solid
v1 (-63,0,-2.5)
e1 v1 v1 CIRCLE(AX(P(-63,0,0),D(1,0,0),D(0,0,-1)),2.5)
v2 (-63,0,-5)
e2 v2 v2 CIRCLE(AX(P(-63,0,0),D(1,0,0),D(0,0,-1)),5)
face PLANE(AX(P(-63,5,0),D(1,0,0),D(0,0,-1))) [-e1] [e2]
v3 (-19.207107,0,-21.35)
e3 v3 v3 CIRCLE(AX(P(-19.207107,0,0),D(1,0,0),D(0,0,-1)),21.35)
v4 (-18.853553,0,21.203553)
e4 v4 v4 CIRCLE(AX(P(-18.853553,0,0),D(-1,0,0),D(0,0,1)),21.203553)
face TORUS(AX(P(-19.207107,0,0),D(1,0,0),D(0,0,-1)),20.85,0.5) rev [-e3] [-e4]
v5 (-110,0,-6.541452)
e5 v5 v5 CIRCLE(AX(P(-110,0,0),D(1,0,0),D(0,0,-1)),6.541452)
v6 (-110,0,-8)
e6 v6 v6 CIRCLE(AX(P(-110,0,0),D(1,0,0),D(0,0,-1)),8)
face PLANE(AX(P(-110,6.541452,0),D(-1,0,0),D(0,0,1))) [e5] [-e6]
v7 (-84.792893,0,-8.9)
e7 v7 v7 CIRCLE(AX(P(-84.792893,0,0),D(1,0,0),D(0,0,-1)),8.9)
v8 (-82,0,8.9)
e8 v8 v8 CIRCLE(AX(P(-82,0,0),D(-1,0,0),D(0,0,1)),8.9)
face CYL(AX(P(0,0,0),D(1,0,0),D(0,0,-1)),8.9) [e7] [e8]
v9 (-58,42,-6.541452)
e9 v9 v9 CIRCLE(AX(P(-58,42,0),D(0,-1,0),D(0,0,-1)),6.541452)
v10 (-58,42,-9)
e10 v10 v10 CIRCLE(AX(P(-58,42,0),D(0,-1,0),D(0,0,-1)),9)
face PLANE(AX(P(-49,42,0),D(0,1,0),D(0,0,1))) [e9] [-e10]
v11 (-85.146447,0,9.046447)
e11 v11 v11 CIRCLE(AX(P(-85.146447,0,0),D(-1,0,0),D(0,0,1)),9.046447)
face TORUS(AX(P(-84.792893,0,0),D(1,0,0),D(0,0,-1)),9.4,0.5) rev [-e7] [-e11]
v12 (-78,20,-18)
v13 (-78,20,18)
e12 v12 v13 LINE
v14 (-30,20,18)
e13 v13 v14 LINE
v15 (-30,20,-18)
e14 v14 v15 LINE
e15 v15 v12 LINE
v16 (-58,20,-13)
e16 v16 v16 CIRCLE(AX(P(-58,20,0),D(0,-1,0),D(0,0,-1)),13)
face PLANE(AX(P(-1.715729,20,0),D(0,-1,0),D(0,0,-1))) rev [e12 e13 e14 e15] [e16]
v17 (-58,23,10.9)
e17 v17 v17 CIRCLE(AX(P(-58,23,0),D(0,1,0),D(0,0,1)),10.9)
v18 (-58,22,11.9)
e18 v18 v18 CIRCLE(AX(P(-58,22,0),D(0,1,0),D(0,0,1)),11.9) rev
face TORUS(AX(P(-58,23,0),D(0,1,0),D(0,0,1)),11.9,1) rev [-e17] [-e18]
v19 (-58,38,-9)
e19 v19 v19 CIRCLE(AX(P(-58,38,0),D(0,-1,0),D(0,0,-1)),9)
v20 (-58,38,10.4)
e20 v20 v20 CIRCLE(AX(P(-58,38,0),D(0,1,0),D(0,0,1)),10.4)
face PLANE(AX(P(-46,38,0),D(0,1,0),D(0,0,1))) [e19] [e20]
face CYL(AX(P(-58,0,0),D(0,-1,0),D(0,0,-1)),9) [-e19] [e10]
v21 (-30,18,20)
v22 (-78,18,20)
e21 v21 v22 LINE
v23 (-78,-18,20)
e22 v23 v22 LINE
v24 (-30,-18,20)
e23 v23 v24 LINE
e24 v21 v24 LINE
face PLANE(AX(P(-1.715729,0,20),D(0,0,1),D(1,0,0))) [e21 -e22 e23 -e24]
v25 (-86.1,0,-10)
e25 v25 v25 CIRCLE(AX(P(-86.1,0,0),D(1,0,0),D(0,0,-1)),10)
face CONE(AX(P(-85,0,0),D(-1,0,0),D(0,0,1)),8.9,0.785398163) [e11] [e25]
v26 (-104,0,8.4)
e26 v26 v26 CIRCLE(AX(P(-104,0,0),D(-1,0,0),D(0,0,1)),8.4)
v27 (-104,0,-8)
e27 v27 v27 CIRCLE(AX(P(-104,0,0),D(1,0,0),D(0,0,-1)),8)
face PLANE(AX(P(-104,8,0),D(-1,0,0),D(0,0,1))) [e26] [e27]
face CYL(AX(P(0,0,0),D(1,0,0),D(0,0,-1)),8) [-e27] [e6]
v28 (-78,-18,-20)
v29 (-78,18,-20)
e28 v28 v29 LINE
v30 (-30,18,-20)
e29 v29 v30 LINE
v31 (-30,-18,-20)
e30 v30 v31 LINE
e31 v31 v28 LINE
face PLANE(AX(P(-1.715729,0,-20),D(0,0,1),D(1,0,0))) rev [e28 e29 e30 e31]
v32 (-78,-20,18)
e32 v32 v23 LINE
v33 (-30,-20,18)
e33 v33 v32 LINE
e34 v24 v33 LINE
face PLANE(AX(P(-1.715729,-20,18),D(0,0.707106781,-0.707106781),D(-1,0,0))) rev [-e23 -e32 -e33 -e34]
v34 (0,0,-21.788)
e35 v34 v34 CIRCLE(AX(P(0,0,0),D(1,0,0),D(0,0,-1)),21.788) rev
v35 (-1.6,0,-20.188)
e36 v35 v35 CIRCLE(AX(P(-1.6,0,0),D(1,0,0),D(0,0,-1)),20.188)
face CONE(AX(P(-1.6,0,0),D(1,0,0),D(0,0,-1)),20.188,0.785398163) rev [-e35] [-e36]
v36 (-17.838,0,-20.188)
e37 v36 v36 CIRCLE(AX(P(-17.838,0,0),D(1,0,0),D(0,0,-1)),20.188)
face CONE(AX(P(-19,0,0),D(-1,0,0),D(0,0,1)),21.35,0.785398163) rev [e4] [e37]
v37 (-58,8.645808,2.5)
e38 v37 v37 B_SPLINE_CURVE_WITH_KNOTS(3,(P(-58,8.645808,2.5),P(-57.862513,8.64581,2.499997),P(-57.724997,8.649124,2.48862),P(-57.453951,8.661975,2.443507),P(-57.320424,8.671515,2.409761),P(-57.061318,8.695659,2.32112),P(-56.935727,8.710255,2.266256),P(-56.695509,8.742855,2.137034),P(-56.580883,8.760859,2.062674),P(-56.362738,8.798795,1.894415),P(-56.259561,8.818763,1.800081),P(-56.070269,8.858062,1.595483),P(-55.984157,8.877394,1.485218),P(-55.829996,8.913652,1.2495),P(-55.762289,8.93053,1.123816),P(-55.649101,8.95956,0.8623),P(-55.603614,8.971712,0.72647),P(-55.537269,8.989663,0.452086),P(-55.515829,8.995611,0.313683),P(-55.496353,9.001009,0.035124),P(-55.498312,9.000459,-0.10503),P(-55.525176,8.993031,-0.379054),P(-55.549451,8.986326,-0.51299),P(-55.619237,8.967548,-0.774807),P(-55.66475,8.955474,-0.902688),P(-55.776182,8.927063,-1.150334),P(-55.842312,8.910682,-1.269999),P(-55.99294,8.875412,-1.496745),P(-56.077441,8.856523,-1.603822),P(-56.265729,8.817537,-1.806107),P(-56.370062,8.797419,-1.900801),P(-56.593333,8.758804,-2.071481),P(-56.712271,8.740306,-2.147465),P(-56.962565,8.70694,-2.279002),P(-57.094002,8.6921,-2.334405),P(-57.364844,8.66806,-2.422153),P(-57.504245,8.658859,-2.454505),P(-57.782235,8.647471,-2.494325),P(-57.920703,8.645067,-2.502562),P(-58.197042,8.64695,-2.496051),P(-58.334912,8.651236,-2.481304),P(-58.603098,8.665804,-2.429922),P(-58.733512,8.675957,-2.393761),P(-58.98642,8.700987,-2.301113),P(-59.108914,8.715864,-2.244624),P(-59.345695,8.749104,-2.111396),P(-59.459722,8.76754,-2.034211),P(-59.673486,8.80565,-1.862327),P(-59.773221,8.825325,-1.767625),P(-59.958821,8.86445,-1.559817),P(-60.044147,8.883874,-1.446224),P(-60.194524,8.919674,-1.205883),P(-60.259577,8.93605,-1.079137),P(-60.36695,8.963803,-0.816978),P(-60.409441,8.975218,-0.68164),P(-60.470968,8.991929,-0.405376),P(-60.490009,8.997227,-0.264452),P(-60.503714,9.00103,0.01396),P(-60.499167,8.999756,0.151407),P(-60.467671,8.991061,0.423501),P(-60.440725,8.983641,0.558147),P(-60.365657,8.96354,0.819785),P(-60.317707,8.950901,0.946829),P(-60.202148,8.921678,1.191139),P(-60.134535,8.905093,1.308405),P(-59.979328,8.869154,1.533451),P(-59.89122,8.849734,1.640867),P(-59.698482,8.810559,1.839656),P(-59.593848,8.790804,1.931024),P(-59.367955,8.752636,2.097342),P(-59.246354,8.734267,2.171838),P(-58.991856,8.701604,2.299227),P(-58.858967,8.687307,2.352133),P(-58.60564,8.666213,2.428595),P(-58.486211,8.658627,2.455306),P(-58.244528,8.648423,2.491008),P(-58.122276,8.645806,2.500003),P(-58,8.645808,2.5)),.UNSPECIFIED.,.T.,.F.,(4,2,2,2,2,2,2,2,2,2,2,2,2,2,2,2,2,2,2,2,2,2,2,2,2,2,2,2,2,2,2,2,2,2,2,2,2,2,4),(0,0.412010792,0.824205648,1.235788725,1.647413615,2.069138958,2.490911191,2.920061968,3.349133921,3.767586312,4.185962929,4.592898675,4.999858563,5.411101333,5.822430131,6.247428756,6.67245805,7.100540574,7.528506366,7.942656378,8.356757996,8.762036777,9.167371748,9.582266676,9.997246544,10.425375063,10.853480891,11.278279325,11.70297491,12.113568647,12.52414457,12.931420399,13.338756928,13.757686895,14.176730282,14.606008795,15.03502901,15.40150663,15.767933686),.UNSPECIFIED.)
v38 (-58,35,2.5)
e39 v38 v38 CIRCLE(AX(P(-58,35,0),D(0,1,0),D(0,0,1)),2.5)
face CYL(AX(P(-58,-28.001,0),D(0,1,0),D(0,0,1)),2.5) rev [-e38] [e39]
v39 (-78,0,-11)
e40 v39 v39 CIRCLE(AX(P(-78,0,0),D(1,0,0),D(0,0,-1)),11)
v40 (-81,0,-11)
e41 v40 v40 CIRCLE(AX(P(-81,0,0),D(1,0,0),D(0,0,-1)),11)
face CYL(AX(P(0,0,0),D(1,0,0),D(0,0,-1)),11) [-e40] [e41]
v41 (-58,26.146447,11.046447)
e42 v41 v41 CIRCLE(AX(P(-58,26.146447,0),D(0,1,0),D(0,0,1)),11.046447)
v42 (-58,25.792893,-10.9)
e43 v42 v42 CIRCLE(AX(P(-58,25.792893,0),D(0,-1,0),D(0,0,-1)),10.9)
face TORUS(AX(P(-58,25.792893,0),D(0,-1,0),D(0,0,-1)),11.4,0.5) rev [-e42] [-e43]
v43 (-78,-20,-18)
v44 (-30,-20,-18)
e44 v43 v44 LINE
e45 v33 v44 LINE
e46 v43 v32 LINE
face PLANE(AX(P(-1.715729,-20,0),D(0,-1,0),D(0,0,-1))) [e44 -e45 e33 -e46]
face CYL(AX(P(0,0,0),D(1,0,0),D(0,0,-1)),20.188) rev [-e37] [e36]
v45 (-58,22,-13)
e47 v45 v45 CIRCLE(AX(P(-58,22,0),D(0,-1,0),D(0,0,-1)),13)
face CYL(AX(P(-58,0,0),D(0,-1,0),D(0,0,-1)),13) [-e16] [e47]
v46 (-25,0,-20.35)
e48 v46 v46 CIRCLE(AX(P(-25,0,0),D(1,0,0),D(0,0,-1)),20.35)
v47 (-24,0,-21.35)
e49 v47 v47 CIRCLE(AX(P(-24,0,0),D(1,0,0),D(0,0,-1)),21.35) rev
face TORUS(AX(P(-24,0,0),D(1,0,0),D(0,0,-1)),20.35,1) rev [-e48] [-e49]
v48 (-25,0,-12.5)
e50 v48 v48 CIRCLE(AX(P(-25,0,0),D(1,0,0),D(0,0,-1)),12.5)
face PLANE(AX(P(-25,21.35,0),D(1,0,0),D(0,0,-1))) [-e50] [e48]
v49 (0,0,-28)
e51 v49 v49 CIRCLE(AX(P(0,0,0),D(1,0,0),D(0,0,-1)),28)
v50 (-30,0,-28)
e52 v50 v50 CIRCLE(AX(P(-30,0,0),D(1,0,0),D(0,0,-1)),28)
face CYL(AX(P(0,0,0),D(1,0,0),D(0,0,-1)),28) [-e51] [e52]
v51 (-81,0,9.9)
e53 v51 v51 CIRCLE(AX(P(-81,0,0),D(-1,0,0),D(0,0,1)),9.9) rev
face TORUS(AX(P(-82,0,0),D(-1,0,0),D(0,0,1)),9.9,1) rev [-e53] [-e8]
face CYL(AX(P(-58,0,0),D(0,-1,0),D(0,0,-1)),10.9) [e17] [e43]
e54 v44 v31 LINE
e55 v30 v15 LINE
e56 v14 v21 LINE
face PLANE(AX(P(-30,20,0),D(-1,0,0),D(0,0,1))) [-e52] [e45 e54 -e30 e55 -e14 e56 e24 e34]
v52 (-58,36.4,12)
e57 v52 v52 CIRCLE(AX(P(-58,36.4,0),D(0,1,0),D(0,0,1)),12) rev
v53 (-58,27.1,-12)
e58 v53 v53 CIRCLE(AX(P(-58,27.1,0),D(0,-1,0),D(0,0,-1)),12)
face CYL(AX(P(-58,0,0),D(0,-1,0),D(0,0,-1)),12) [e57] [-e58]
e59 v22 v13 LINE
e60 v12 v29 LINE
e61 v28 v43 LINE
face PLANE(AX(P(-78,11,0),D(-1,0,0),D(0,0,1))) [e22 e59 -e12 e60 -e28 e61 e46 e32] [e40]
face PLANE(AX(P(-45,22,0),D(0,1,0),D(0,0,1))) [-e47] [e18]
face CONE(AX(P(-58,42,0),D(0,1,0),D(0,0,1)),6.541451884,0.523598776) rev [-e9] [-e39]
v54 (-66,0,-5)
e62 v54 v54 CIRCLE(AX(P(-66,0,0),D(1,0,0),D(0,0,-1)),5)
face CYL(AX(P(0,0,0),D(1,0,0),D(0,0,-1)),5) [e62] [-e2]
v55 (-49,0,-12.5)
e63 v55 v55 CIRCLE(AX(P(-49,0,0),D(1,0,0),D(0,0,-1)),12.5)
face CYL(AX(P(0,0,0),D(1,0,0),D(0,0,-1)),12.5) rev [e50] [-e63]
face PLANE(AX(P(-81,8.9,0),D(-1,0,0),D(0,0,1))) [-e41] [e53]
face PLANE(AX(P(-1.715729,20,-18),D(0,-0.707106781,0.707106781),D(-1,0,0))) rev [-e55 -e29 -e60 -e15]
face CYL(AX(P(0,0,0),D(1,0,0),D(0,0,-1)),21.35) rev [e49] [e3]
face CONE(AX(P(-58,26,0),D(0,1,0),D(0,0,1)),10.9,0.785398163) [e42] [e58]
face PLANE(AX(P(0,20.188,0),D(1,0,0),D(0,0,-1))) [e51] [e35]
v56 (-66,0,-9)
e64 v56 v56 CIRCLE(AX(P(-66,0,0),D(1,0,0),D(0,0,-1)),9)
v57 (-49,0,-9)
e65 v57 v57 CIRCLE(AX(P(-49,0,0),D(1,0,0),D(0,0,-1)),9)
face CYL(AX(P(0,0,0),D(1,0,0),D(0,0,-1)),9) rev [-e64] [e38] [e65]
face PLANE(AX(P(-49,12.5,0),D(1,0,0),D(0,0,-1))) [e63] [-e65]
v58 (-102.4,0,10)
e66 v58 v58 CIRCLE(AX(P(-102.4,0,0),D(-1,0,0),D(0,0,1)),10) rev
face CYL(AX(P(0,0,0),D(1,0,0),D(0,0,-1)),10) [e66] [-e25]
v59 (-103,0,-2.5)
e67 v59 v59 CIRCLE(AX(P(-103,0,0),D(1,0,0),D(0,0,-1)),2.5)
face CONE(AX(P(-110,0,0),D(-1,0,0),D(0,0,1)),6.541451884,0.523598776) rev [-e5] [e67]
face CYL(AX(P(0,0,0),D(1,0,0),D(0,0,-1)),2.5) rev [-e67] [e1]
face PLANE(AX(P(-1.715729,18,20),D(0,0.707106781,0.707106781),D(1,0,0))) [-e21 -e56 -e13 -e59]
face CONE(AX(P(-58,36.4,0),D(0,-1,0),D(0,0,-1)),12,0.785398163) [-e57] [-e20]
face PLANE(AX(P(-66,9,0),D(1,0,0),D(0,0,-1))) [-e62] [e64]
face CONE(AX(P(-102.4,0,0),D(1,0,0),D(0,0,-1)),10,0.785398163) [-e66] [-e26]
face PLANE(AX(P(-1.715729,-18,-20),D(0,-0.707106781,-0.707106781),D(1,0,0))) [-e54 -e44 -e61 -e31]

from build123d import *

# Parameters (mm, degrees)
EXTRUDE_2_DEPTH          = 48
CUT_EXTRUDE_1_REACH      = 131.819
CUT_EXTRUDE_1_END_RADIUS = 9
SKETCH_5_R               = 2.5
CHAMFER_1_SIZE           = 1.6
CHAMFER_2_SIZE           = 1.6
FILLET_1_R               = 1
FILLET_2_R               = 0.5
CHAMFER_3_SIZE           = 2
CHAMFER_4_SIZE           = 1.6


with BuildPart() as part:
    # Эскиз1 → Повернуть1 (revolve)
    with BuildSketch(Plane.XY, mode=Mode.PRIVATE) as revolve_1_sk:
        Polygon((0, 20.188), (0, 28), (-30, 28), (-30, 20), (-78, 20), (-78, 11), (-81, 11), (-81, 8.9), (-85, 8.9), (-86.1, 10), (-104, 10), (-104, 8), (-110, 8), (-110, 6.541451884), (-103, 2.5), (-63, 2.5), (-63, 5), (-66, 5), (-66, 9), (-49, 9), (-49, 12.5), (-25, 12.5), (-25, 21.35), (-19, 21.35), (-17.838, 20.188), align=None)
    revolve(revolve_1_sk.sketch.rotate(Axis((0, 0, 0), (-1, 0, 0)), 90), axis=Axis((0, 0, 0), (-1, 0, 0)))

    # Эскиз2 → Бобышка-Вытянуть2 (add)
    with BuildSketch(Plane.ZY.offset(78)):
        with BuildLine():
            ThreePointArc((9.9e-08, 20), (14.142135659, 14.142135589), (20, 0))
            Line((20, 0), (20, 20))
            Line((20, 20), (9.9e-08, 20))
        make_face()
        with BuildLine():
            Line((-20, 20), (-20, 9.9e-08))
            ThreePointArc((-20, 9.9e-08), (-14.142135554, 14.142135694), (9.9e-08, 20))
            Line((9.9e-08, 20), (-20, 20))
        make_face()
        with BuildLine():
            Line((-20, 9.9e-08), (-20, -20))
            Line((-20, -20), (-9.9e-08, -20))
            ThreePointArc((-9.9e-08, -20), (-14.142135694, -14.142135554), (-20, 9.9e-08))
        make_face()
        with BuildLine():
            ThreePointArc((20, 0), (14.142135589, -14.142135659), (-9.9e-08, -20))
            Line((-9.9e-08, -20), (20, -20))
            Line((20, -20), (20, 0))
        make_face()
    extrude(amount=-EXTRUDE_2_DEPTH)

    # Эскиз4 → Повернуть2 (revolve)
    with BuildSketch(Plane.XY, mode=Mode.PRIVATE) as revolve_2_sk:
        Polygon((-45, 20), (-45, 22), (-47.1, 22), (-47.1, 26), (-46, 27.1), (-46, 38), (-49, 38), (-49, 42), (-51.458548116, 42), (-55.5, 35), (-58, 35), (-58, 20), align=None)
    revolve(revolve_2_sk.sketch.rotate(Axis((-58, 0, 0), (0, 1, 0)), 90), axis=Axis((-58, 0, 0), (0, 1, 0)))

    # Вырез-Вытянуть1: up to this cylinder (the profile starts outside it)
    cut_extrude_1_end = Plane(origin=(-58, 0, 0), z_dir=(1, 0, 0)) * Cylinder(CUT_EXTRUDE_1_END_RADIUS, 282.638, mode=Mode.PRIVATE)
    # Эскиз5 → Вырез-Вытянуть1 (cut, up to the surface)
    with BuildSketch(Plane(origin=(0, 35, 0), x_dir=(1, 0, 0), z_dir=(0, 1, 0)), mode=Mode.PRIVATE) as cut_extrude_1_sk1:
        with Locations(Location((-58, 0, 0), (0, 0, 270))):
            Circle(SKETCH_5_R)
    cut_extrude_1_tool1 = extrude(cut_extrude_1_sk1.sketch, amount=-CUT_EXTRUDE_1_REACH, mode=Mode.PRIVATE) - cut_extrude_1_end
    add(cut_extrude_1_tool1.solids().sort_by_distance((-58, 35, 0))[0], mode=Mode.SUBTRACT)

    # Фаска1
    chamfer_1_edges = [part.edges().sort_by_distance(p)[0] for p in [
        (0, 0, 20.188),
    ]]
    chamfer(chamfer_1_edges, length=CHAMFER_1_SIZE)

    # Фаска2
    chamfer_2_edges = [part.edges().sort_by_distance(p)[0] for p in [
        (-58, 38, 12),
    ]]
    chamfer(chamfer_2_edges, length=CHAMFER_2_SIZE)

    # Скругление1
    fillet_1_edges = [part.edges().sort_by_distance(p)[0] for p in [
        (-25, 0, 21.35),
        (-81, 0, 8.9),
        (-58, 22, 10.9),
    ]]
    fillet(fillet_1_edges, radius=FILLET_1_R)

    # Скругление2
    fillet_2_edges = [part.edges().sort_by_distance(p)[0] for p in [
        (-19, 0, 21.35),
        (-85, 0, 8.9),
        (-58, 26, 10.9),
    ]]
    fillet(fillet_2_edges, radius=FILLET_2_R)

    # Фаска3
    # the kernel refuses this chamfer: 2 mm, written as the material it takes off along each edge
    with BuildSketch(Plane(origin=(-83.143365976, 20, 20), x_dir=(0, 0.027495876610585647, -0.9996219169112968), z_dir=(1, 0, 0)), Plane(origin=(-83.143365976, -20, 20), x_dir=(0, 0.9996219169112968, 0.027495876610585647), z_dir=(1, 0, 0))) as chamfer_3_piece_1:
        Polygon((CHAMFER_3_SIZE * 0.999621916911, -CHAMFER_3_SIZE * 0.0274958766106), (-CHAMFER_3_SIZE * 0.0274958766106, -CHAMFER_3_SIZE * 0.999621916911), (0, 0), align=None)
    extrude(amount=53.143365976, mode=Mode.SUBTRACT)
    with BuildSketch(Plane(origin=(-83.143365976, 20, -20), x_dir=(0, 0.027495876610585647, 0.9996219169112968), z_dir=(1, 0, 0)), Plane(origin=(-83.143365976, -20, -20), x_dir=(0, 0.9996219169112968, -0.027495876610585647), z_dir=(1, 0, 0))) as chamfer_3_piece_2:
        Polygon((CHAMFER_3_SIZE * 0.999621916911, CHAMFER_3_SIZE * 0.0274958766106), (-CHAMFER_3_SIZE * 0.0274958766106, CHAMFER_3_SIZE * 0.999621916911), (0, 0), align=None)
    extrude(amount=53.143365976, mode=Mode.SUBTRACT)

    # Фаска4
    chamfer_4_edges = [part.edges().sort_by_distance(p)[0] for p in [
        (-104, 0, 10),
    ]]
    chamfer(chamfer_4_edges, length=CHAMFER_4_SIZE)


solid = part.part
